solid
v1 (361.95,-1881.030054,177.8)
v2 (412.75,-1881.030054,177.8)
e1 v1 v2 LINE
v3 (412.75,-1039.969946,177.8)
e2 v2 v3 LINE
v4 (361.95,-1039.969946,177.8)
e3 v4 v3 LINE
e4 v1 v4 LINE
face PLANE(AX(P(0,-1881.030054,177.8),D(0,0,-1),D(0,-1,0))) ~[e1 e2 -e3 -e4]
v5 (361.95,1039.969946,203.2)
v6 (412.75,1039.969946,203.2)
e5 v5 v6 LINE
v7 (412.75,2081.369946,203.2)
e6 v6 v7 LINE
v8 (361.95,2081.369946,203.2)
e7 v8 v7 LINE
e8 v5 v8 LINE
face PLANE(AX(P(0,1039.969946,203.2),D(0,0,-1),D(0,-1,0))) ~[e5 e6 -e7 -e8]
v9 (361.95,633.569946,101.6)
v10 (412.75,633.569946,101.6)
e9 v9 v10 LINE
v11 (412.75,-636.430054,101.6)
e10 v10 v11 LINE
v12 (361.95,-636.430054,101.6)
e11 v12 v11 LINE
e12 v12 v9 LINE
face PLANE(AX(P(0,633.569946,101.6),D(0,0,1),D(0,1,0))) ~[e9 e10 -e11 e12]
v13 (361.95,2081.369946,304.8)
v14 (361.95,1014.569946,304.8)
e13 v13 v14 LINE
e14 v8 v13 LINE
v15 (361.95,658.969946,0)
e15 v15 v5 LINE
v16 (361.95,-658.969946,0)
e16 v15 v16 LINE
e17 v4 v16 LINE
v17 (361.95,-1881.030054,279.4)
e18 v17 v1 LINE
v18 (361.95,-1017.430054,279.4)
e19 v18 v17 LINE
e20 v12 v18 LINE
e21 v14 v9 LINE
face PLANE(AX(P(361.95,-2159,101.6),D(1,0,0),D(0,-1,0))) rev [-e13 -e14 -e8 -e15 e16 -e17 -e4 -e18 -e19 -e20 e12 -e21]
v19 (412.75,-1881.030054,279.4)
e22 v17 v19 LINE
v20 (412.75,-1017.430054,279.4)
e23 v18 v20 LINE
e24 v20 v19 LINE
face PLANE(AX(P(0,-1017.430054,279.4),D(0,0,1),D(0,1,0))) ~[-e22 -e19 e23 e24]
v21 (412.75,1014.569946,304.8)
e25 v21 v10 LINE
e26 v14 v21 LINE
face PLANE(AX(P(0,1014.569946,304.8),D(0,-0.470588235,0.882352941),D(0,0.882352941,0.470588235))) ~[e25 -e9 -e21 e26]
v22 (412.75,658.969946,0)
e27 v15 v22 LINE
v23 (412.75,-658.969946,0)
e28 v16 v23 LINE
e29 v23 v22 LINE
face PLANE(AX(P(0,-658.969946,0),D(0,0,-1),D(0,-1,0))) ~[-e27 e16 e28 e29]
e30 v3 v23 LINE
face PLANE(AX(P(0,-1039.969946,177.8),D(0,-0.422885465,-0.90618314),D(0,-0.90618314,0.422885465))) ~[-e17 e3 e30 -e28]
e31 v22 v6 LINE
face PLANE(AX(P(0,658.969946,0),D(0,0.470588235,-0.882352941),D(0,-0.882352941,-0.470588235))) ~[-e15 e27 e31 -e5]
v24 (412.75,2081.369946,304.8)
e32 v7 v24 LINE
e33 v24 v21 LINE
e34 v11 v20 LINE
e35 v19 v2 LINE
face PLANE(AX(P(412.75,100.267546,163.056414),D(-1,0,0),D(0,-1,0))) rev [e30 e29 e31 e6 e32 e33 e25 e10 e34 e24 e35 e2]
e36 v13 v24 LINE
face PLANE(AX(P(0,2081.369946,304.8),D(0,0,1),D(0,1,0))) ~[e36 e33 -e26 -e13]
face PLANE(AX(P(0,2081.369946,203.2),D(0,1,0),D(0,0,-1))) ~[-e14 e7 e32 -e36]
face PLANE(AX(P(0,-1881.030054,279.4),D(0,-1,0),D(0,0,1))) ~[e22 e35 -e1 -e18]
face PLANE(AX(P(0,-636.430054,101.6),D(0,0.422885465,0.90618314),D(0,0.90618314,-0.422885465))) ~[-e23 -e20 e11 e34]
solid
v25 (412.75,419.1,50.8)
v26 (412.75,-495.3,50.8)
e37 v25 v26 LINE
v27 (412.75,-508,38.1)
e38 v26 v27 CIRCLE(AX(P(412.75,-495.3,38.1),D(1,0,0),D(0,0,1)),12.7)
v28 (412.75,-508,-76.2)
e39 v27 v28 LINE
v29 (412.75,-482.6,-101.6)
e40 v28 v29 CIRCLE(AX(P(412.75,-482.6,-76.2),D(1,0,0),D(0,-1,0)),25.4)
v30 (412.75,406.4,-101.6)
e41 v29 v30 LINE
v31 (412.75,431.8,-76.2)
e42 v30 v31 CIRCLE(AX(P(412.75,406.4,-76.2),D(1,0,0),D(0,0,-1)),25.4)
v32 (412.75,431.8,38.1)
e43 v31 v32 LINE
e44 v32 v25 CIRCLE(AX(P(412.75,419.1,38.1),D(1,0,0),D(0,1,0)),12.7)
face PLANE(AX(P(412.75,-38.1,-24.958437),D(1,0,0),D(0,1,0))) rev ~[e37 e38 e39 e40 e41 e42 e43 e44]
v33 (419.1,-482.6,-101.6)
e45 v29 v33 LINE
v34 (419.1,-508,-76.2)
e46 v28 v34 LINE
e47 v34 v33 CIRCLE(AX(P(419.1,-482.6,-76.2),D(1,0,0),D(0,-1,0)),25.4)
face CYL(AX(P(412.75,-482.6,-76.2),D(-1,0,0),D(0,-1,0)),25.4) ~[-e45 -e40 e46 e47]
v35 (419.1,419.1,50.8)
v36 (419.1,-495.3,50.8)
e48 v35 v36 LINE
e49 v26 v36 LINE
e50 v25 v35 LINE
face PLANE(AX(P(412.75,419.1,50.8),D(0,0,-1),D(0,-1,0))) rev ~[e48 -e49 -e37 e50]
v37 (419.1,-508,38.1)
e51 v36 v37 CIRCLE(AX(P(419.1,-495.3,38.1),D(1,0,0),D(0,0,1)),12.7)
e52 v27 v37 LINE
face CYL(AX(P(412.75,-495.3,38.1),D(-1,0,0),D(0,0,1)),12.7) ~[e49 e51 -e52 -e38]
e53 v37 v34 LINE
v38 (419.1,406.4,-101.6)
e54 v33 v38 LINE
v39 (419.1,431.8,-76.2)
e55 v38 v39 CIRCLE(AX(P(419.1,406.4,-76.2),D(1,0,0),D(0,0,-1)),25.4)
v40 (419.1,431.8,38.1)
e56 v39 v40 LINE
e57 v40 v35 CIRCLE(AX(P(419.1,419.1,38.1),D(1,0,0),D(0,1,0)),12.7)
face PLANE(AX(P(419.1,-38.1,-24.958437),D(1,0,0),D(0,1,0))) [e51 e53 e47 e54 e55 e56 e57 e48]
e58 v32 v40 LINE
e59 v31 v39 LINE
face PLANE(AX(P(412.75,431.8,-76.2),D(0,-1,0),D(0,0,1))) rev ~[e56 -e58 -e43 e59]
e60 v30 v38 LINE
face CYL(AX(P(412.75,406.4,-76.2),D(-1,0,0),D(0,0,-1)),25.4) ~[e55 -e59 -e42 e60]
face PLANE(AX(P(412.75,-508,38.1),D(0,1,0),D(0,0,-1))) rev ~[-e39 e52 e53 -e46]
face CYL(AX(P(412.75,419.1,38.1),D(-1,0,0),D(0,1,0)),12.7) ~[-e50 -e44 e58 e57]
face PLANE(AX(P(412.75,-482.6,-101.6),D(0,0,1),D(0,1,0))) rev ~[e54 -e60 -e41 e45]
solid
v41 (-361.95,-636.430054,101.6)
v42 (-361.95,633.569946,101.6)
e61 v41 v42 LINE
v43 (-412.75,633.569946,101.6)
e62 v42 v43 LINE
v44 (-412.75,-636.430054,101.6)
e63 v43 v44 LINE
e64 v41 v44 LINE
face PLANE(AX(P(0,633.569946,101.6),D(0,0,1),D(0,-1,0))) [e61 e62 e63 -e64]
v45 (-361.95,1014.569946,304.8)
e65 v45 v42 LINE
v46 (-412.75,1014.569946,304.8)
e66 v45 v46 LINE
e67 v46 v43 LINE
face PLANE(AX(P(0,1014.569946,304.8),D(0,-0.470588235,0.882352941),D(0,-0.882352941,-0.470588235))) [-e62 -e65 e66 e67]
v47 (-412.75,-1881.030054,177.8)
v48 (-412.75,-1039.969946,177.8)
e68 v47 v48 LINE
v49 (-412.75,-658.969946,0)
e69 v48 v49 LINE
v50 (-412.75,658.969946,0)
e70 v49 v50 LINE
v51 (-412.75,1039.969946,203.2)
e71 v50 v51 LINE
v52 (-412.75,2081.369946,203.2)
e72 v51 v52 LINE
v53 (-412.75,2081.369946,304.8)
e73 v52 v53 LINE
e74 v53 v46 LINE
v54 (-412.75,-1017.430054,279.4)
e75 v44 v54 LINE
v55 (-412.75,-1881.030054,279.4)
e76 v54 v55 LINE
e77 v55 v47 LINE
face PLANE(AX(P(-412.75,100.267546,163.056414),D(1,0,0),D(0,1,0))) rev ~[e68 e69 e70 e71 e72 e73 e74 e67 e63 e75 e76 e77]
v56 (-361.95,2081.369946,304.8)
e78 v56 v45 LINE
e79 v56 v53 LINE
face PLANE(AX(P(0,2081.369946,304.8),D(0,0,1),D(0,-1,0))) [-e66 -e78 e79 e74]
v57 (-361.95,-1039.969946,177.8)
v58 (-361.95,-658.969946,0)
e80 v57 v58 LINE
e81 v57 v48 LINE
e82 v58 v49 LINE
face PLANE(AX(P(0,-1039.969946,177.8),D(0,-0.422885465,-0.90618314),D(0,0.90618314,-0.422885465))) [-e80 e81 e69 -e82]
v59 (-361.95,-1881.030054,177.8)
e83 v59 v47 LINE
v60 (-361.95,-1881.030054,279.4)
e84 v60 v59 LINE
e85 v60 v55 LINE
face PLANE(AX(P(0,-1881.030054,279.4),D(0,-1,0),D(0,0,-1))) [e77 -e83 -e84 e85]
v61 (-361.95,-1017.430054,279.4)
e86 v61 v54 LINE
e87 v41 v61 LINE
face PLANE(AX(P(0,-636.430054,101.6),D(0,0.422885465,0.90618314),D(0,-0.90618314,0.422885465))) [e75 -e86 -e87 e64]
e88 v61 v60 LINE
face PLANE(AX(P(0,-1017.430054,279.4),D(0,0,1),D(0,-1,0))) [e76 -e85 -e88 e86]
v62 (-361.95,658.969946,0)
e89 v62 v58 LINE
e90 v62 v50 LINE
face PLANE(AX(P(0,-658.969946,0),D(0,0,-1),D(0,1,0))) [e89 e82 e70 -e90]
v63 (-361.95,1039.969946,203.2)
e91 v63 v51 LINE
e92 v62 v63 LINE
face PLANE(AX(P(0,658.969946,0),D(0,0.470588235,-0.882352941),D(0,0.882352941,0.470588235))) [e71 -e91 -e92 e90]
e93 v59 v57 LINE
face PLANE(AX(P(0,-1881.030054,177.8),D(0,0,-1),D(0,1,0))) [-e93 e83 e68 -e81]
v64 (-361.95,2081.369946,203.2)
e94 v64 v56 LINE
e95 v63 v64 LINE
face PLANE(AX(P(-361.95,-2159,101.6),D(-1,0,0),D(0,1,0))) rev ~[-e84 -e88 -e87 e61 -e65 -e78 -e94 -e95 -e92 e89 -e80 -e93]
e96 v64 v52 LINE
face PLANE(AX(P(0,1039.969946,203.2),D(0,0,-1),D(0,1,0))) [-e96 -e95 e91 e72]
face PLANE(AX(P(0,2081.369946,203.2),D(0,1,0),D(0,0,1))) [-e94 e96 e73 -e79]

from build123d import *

# Parameters (mm, degrees)
F1_DEPTH = 412.75
F2_W     = 361.95
F2_H     = 4318
F3_DEPTH = 101.601
F4_DEPTH = 203.201
F7_DEPTH = 6.35


# Not quite as in the source:
# - a feature names something its author has since deleted; it is built from what else it names


with BuildPart() as f1:
    # F0 (on Right) → F1 (new body)
    with BuildSketch(Plane.YZ):
        Polygon((-1017.4300536931, 279.4), (-1881.0300536931, 279.4), (-1881.0300536931, 177.8), (-1039.9699463069, 177.8), (-658.9699463069, 0), (658.9699463069, 0), (1039.9699463069, 203.2), (2081.3699463069, 203.2), (2081.3699463069, 304.8), (1014.5699463069, 304.8), (633.5699463069, 101.6), (-636.4300536931, 101.6), align=None)
    extrude(amount=-F1_DEPTH)

    # F2 (on face) → F3 (cut, through all)
    with BuildSketch(Plane.XY.offset(101.6)):
        with Locations((-180.975, 0)):
            Rectangle(F2_W, F2_H)
    extrude(amount=-F3_DEPTH, mode=Mode.SUBTRACT)

    # F2 (on face) → F4 (cut, through all)
    with BuildSketch(Plane.XY.offset(101.6)):
        with Locations((-180.975, 0)):
            Rectangle(F2_W, F2_H)
    extrude(amount=F4_DEPTH, mode=Mode.SUBTRACT)


with BuildPart() as f5_1:
    # F5: instance of F1
    add(f1.part.mirror(Plane.YZ))


with BuildPart() as f7:
    # F6 (on face) → F7 (new body)
    with BuildSketch(Plane.YZ.offset(412.75)):
        with BuildLine():
            Line((419.1, 50.8), (-495.3, 50.8))
            ThreePointArc((-495.3, 50.8), (-504.2802561211, 47.0802561211), (-508, 38.1))
            Line((-508, 38.1), (-508, -76.2))
            ThreePointArc((-508, -76.2), (-500.5605122421, -94.1605122421), (-482.6, -101.6))
            Line((-482.6, -101.6), (406.4, -101.6))
            ThreePointArc((406.4, -101.6), (424.3605122421, -94.1605122421), (431.8, -76.2))
            Line((431.8, -76.2), (431.8, 38.1))
            ThreePointArc((431.8, 38.1), (428.0802561211, 47.0802561211), (419.1, 50.8))
        make_face()
    extrude(amount=F7_DEPTH)


solid = Compound([f1.part, f5_1.part, f7.part])
